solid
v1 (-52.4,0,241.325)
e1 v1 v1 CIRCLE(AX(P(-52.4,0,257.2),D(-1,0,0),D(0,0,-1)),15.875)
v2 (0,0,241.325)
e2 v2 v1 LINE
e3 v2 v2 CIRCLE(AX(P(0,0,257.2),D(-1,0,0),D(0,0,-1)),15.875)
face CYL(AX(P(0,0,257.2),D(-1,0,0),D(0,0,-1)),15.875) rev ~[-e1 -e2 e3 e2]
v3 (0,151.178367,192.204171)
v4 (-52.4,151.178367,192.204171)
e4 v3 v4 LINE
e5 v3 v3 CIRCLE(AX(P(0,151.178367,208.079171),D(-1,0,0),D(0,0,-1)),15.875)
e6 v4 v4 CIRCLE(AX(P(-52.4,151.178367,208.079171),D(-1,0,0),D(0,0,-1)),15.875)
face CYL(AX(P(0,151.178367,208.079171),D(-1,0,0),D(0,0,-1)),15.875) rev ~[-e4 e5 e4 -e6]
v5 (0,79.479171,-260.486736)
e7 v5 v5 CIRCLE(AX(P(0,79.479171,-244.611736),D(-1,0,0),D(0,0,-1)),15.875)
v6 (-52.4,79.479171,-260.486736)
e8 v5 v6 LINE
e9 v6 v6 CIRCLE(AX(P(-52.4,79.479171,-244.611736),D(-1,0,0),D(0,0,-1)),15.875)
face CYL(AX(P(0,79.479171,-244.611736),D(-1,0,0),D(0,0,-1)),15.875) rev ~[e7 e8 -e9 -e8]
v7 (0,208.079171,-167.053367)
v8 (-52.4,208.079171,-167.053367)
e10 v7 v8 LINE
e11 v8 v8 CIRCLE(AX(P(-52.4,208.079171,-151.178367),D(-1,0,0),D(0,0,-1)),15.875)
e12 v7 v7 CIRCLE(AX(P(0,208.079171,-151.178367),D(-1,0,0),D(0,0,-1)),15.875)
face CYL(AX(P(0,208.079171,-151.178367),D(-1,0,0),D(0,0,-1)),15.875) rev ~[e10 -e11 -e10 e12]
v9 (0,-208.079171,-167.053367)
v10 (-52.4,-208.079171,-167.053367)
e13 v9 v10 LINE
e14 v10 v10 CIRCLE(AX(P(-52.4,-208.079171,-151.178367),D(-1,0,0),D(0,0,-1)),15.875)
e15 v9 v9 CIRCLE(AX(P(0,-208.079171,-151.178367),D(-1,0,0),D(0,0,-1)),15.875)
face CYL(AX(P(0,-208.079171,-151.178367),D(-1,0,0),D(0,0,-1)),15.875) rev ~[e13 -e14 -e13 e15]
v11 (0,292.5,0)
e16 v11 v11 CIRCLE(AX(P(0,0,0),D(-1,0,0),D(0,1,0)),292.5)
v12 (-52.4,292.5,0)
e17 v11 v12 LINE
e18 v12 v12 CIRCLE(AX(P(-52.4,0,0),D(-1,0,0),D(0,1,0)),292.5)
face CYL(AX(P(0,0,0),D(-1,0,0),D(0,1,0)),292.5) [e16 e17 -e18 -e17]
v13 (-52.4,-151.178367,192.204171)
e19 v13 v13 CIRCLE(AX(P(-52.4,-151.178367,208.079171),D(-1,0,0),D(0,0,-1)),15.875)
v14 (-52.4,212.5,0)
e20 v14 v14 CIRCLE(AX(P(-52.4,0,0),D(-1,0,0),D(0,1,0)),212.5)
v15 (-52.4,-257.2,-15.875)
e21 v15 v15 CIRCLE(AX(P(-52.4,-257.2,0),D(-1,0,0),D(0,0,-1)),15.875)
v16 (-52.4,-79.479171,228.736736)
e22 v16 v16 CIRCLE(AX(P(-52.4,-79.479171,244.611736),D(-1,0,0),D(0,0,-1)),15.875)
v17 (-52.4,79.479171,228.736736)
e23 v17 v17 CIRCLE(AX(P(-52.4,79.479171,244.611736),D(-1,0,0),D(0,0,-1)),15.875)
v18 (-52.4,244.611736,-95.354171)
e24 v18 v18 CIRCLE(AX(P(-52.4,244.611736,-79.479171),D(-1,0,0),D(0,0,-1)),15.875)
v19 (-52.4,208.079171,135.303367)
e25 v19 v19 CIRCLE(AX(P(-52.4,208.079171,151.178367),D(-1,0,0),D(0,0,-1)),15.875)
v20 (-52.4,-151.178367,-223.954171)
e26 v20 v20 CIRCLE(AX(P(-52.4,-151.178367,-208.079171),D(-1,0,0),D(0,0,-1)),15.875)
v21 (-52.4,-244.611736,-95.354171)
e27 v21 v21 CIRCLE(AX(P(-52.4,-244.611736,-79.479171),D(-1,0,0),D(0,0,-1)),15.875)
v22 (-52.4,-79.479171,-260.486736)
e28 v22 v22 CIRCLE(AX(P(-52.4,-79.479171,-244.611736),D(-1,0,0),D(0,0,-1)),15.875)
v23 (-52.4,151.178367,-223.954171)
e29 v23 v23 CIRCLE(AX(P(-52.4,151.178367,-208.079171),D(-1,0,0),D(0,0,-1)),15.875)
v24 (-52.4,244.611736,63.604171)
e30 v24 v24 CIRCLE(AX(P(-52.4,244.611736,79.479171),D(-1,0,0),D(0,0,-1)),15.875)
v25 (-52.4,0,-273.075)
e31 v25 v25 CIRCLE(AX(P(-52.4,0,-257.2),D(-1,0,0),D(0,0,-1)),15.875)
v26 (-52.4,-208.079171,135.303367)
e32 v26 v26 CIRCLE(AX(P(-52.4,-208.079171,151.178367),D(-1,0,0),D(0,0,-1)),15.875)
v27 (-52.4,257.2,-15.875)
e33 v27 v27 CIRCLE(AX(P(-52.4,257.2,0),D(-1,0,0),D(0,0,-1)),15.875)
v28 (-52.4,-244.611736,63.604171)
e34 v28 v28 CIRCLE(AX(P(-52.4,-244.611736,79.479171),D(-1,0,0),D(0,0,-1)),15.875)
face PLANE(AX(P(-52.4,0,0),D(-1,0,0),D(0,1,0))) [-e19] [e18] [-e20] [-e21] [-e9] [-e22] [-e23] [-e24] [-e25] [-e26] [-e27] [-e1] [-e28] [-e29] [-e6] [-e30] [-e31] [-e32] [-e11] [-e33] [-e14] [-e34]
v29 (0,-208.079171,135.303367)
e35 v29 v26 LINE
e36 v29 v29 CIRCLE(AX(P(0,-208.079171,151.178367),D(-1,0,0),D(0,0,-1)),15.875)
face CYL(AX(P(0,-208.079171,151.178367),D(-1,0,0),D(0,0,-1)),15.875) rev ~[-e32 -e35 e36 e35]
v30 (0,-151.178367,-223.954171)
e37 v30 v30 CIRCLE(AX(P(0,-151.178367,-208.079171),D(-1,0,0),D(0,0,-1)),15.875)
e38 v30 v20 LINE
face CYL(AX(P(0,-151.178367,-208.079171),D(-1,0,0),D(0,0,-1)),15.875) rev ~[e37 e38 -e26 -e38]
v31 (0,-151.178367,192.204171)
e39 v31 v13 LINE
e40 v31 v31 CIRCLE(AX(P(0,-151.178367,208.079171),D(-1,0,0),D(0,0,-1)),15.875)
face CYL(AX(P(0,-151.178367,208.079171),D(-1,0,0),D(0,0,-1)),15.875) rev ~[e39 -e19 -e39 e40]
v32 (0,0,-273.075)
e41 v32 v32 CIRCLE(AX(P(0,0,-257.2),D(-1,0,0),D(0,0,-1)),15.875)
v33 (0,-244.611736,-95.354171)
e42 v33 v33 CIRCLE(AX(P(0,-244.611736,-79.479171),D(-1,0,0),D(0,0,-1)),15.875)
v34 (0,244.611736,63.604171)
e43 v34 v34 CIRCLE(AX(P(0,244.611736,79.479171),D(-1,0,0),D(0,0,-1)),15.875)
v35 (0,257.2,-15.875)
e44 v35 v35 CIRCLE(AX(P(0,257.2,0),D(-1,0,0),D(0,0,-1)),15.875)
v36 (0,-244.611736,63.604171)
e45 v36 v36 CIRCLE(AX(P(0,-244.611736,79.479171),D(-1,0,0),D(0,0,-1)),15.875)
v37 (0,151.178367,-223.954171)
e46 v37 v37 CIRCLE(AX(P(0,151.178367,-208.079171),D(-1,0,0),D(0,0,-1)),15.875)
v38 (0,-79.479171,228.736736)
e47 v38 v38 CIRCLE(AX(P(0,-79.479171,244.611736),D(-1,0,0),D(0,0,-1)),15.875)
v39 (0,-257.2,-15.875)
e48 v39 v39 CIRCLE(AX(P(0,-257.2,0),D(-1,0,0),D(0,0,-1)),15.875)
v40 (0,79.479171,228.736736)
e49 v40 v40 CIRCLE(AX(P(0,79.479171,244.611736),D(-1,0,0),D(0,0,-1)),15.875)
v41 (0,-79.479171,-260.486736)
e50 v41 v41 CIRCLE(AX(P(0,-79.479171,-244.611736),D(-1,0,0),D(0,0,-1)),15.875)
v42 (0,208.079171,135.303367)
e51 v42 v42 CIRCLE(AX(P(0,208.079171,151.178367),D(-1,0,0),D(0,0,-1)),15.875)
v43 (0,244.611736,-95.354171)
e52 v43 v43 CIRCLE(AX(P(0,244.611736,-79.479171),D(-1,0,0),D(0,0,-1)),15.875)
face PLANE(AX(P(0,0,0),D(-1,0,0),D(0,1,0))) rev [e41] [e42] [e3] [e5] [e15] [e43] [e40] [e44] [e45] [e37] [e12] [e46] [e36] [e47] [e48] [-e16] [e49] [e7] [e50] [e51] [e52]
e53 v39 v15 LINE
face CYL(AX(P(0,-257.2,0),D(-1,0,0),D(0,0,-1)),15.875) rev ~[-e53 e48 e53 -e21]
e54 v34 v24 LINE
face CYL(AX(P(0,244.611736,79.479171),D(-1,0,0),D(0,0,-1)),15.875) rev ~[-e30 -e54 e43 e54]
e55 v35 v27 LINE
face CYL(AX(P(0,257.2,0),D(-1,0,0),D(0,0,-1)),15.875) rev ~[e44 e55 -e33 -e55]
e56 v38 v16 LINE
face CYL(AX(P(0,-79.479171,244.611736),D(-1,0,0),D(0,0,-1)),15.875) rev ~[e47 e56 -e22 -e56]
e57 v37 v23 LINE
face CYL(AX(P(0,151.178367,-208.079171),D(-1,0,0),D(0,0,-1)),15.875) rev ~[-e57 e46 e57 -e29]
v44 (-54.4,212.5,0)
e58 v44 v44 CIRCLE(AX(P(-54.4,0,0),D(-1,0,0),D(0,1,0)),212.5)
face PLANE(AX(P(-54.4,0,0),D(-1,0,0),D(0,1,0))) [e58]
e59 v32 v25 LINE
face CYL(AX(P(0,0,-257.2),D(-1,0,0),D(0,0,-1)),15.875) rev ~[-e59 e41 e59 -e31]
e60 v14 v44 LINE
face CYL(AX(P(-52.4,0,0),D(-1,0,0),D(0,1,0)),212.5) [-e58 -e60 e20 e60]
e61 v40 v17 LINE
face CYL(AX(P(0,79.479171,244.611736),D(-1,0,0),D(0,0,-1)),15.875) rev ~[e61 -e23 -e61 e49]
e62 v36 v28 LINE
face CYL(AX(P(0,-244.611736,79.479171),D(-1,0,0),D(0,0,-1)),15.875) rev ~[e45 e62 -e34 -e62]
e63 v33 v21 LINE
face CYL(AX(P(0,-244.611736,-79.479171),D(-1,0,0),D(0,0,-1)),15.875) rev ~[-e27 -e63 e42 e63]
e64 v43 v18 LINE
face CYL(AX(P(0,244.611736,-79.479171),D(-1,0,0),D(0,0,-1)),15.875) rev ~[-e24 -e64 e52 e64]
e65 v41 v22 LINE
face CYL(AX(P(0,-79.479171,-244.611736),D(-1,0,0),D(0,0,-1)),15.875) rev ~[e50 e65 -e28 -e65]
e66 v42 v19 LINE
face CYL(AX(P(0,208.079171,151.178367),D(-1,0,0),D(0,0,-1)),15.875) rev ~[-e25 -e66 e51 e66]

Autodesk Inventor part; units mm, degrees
ref_plane "YZ Plane" through (0, 0, 0) normal (1, 0, 0) x (0, 1, 0)
ref_plane "XZ Plane" through (0, 0, 0) normal (0, 1, 0) x (-1, 0, 0)
ref_plane "XY Plane" through (0, 0, 0) normal (0, 0, 1) x (1, 0, 0)
sketch "Sketch1" plane through (0, 0, 0) normal (0, 0, 1) x (1, 0, 0)
  line L0 (0, 0) -> (-284.4922, 0)
  line L1 (0, 0) -> (0, 292.5)
  line L2 (0, 292.5) -> (-52.4, 292.5)
  line L3 (-52.4, 292.5) -> (-52.4, 212.5)
  line L4 (-52.4, 212.5) -> (-54.4, 212.5)
  line L5 (-54.4, 212.5) -> (-54.4, 0)
  dimension "d0" = 585
  dimension "d1" = 52.4
  dimension "d2" = 2
  dimension "d3" = 425
revolve "Revolution1" add sketch "Sketch1" angle 360 about axis through (0, 0, 0) along (-1, 0, 0)
sketch "Sketch2" plane through (0, 0, 0) normal (1, 0, 0) x (0, 0, -1)
  point P0 (0, 0)
  point P1 (0, 257.2)
  dimension "d5" = 257.2
hole "Hole1" at (0, 257.2, 0) direction (-1, 0, 0) diameter 31.75 end up to surface
pattern_circular "Circular Pattern1" count 20 over 360 about axis through (-26.2, 0, 0) along (1, 0, 0) of "Hole1"
properties part number "Blind Flange 14 in" material "ASTM A105 Gr.B"
